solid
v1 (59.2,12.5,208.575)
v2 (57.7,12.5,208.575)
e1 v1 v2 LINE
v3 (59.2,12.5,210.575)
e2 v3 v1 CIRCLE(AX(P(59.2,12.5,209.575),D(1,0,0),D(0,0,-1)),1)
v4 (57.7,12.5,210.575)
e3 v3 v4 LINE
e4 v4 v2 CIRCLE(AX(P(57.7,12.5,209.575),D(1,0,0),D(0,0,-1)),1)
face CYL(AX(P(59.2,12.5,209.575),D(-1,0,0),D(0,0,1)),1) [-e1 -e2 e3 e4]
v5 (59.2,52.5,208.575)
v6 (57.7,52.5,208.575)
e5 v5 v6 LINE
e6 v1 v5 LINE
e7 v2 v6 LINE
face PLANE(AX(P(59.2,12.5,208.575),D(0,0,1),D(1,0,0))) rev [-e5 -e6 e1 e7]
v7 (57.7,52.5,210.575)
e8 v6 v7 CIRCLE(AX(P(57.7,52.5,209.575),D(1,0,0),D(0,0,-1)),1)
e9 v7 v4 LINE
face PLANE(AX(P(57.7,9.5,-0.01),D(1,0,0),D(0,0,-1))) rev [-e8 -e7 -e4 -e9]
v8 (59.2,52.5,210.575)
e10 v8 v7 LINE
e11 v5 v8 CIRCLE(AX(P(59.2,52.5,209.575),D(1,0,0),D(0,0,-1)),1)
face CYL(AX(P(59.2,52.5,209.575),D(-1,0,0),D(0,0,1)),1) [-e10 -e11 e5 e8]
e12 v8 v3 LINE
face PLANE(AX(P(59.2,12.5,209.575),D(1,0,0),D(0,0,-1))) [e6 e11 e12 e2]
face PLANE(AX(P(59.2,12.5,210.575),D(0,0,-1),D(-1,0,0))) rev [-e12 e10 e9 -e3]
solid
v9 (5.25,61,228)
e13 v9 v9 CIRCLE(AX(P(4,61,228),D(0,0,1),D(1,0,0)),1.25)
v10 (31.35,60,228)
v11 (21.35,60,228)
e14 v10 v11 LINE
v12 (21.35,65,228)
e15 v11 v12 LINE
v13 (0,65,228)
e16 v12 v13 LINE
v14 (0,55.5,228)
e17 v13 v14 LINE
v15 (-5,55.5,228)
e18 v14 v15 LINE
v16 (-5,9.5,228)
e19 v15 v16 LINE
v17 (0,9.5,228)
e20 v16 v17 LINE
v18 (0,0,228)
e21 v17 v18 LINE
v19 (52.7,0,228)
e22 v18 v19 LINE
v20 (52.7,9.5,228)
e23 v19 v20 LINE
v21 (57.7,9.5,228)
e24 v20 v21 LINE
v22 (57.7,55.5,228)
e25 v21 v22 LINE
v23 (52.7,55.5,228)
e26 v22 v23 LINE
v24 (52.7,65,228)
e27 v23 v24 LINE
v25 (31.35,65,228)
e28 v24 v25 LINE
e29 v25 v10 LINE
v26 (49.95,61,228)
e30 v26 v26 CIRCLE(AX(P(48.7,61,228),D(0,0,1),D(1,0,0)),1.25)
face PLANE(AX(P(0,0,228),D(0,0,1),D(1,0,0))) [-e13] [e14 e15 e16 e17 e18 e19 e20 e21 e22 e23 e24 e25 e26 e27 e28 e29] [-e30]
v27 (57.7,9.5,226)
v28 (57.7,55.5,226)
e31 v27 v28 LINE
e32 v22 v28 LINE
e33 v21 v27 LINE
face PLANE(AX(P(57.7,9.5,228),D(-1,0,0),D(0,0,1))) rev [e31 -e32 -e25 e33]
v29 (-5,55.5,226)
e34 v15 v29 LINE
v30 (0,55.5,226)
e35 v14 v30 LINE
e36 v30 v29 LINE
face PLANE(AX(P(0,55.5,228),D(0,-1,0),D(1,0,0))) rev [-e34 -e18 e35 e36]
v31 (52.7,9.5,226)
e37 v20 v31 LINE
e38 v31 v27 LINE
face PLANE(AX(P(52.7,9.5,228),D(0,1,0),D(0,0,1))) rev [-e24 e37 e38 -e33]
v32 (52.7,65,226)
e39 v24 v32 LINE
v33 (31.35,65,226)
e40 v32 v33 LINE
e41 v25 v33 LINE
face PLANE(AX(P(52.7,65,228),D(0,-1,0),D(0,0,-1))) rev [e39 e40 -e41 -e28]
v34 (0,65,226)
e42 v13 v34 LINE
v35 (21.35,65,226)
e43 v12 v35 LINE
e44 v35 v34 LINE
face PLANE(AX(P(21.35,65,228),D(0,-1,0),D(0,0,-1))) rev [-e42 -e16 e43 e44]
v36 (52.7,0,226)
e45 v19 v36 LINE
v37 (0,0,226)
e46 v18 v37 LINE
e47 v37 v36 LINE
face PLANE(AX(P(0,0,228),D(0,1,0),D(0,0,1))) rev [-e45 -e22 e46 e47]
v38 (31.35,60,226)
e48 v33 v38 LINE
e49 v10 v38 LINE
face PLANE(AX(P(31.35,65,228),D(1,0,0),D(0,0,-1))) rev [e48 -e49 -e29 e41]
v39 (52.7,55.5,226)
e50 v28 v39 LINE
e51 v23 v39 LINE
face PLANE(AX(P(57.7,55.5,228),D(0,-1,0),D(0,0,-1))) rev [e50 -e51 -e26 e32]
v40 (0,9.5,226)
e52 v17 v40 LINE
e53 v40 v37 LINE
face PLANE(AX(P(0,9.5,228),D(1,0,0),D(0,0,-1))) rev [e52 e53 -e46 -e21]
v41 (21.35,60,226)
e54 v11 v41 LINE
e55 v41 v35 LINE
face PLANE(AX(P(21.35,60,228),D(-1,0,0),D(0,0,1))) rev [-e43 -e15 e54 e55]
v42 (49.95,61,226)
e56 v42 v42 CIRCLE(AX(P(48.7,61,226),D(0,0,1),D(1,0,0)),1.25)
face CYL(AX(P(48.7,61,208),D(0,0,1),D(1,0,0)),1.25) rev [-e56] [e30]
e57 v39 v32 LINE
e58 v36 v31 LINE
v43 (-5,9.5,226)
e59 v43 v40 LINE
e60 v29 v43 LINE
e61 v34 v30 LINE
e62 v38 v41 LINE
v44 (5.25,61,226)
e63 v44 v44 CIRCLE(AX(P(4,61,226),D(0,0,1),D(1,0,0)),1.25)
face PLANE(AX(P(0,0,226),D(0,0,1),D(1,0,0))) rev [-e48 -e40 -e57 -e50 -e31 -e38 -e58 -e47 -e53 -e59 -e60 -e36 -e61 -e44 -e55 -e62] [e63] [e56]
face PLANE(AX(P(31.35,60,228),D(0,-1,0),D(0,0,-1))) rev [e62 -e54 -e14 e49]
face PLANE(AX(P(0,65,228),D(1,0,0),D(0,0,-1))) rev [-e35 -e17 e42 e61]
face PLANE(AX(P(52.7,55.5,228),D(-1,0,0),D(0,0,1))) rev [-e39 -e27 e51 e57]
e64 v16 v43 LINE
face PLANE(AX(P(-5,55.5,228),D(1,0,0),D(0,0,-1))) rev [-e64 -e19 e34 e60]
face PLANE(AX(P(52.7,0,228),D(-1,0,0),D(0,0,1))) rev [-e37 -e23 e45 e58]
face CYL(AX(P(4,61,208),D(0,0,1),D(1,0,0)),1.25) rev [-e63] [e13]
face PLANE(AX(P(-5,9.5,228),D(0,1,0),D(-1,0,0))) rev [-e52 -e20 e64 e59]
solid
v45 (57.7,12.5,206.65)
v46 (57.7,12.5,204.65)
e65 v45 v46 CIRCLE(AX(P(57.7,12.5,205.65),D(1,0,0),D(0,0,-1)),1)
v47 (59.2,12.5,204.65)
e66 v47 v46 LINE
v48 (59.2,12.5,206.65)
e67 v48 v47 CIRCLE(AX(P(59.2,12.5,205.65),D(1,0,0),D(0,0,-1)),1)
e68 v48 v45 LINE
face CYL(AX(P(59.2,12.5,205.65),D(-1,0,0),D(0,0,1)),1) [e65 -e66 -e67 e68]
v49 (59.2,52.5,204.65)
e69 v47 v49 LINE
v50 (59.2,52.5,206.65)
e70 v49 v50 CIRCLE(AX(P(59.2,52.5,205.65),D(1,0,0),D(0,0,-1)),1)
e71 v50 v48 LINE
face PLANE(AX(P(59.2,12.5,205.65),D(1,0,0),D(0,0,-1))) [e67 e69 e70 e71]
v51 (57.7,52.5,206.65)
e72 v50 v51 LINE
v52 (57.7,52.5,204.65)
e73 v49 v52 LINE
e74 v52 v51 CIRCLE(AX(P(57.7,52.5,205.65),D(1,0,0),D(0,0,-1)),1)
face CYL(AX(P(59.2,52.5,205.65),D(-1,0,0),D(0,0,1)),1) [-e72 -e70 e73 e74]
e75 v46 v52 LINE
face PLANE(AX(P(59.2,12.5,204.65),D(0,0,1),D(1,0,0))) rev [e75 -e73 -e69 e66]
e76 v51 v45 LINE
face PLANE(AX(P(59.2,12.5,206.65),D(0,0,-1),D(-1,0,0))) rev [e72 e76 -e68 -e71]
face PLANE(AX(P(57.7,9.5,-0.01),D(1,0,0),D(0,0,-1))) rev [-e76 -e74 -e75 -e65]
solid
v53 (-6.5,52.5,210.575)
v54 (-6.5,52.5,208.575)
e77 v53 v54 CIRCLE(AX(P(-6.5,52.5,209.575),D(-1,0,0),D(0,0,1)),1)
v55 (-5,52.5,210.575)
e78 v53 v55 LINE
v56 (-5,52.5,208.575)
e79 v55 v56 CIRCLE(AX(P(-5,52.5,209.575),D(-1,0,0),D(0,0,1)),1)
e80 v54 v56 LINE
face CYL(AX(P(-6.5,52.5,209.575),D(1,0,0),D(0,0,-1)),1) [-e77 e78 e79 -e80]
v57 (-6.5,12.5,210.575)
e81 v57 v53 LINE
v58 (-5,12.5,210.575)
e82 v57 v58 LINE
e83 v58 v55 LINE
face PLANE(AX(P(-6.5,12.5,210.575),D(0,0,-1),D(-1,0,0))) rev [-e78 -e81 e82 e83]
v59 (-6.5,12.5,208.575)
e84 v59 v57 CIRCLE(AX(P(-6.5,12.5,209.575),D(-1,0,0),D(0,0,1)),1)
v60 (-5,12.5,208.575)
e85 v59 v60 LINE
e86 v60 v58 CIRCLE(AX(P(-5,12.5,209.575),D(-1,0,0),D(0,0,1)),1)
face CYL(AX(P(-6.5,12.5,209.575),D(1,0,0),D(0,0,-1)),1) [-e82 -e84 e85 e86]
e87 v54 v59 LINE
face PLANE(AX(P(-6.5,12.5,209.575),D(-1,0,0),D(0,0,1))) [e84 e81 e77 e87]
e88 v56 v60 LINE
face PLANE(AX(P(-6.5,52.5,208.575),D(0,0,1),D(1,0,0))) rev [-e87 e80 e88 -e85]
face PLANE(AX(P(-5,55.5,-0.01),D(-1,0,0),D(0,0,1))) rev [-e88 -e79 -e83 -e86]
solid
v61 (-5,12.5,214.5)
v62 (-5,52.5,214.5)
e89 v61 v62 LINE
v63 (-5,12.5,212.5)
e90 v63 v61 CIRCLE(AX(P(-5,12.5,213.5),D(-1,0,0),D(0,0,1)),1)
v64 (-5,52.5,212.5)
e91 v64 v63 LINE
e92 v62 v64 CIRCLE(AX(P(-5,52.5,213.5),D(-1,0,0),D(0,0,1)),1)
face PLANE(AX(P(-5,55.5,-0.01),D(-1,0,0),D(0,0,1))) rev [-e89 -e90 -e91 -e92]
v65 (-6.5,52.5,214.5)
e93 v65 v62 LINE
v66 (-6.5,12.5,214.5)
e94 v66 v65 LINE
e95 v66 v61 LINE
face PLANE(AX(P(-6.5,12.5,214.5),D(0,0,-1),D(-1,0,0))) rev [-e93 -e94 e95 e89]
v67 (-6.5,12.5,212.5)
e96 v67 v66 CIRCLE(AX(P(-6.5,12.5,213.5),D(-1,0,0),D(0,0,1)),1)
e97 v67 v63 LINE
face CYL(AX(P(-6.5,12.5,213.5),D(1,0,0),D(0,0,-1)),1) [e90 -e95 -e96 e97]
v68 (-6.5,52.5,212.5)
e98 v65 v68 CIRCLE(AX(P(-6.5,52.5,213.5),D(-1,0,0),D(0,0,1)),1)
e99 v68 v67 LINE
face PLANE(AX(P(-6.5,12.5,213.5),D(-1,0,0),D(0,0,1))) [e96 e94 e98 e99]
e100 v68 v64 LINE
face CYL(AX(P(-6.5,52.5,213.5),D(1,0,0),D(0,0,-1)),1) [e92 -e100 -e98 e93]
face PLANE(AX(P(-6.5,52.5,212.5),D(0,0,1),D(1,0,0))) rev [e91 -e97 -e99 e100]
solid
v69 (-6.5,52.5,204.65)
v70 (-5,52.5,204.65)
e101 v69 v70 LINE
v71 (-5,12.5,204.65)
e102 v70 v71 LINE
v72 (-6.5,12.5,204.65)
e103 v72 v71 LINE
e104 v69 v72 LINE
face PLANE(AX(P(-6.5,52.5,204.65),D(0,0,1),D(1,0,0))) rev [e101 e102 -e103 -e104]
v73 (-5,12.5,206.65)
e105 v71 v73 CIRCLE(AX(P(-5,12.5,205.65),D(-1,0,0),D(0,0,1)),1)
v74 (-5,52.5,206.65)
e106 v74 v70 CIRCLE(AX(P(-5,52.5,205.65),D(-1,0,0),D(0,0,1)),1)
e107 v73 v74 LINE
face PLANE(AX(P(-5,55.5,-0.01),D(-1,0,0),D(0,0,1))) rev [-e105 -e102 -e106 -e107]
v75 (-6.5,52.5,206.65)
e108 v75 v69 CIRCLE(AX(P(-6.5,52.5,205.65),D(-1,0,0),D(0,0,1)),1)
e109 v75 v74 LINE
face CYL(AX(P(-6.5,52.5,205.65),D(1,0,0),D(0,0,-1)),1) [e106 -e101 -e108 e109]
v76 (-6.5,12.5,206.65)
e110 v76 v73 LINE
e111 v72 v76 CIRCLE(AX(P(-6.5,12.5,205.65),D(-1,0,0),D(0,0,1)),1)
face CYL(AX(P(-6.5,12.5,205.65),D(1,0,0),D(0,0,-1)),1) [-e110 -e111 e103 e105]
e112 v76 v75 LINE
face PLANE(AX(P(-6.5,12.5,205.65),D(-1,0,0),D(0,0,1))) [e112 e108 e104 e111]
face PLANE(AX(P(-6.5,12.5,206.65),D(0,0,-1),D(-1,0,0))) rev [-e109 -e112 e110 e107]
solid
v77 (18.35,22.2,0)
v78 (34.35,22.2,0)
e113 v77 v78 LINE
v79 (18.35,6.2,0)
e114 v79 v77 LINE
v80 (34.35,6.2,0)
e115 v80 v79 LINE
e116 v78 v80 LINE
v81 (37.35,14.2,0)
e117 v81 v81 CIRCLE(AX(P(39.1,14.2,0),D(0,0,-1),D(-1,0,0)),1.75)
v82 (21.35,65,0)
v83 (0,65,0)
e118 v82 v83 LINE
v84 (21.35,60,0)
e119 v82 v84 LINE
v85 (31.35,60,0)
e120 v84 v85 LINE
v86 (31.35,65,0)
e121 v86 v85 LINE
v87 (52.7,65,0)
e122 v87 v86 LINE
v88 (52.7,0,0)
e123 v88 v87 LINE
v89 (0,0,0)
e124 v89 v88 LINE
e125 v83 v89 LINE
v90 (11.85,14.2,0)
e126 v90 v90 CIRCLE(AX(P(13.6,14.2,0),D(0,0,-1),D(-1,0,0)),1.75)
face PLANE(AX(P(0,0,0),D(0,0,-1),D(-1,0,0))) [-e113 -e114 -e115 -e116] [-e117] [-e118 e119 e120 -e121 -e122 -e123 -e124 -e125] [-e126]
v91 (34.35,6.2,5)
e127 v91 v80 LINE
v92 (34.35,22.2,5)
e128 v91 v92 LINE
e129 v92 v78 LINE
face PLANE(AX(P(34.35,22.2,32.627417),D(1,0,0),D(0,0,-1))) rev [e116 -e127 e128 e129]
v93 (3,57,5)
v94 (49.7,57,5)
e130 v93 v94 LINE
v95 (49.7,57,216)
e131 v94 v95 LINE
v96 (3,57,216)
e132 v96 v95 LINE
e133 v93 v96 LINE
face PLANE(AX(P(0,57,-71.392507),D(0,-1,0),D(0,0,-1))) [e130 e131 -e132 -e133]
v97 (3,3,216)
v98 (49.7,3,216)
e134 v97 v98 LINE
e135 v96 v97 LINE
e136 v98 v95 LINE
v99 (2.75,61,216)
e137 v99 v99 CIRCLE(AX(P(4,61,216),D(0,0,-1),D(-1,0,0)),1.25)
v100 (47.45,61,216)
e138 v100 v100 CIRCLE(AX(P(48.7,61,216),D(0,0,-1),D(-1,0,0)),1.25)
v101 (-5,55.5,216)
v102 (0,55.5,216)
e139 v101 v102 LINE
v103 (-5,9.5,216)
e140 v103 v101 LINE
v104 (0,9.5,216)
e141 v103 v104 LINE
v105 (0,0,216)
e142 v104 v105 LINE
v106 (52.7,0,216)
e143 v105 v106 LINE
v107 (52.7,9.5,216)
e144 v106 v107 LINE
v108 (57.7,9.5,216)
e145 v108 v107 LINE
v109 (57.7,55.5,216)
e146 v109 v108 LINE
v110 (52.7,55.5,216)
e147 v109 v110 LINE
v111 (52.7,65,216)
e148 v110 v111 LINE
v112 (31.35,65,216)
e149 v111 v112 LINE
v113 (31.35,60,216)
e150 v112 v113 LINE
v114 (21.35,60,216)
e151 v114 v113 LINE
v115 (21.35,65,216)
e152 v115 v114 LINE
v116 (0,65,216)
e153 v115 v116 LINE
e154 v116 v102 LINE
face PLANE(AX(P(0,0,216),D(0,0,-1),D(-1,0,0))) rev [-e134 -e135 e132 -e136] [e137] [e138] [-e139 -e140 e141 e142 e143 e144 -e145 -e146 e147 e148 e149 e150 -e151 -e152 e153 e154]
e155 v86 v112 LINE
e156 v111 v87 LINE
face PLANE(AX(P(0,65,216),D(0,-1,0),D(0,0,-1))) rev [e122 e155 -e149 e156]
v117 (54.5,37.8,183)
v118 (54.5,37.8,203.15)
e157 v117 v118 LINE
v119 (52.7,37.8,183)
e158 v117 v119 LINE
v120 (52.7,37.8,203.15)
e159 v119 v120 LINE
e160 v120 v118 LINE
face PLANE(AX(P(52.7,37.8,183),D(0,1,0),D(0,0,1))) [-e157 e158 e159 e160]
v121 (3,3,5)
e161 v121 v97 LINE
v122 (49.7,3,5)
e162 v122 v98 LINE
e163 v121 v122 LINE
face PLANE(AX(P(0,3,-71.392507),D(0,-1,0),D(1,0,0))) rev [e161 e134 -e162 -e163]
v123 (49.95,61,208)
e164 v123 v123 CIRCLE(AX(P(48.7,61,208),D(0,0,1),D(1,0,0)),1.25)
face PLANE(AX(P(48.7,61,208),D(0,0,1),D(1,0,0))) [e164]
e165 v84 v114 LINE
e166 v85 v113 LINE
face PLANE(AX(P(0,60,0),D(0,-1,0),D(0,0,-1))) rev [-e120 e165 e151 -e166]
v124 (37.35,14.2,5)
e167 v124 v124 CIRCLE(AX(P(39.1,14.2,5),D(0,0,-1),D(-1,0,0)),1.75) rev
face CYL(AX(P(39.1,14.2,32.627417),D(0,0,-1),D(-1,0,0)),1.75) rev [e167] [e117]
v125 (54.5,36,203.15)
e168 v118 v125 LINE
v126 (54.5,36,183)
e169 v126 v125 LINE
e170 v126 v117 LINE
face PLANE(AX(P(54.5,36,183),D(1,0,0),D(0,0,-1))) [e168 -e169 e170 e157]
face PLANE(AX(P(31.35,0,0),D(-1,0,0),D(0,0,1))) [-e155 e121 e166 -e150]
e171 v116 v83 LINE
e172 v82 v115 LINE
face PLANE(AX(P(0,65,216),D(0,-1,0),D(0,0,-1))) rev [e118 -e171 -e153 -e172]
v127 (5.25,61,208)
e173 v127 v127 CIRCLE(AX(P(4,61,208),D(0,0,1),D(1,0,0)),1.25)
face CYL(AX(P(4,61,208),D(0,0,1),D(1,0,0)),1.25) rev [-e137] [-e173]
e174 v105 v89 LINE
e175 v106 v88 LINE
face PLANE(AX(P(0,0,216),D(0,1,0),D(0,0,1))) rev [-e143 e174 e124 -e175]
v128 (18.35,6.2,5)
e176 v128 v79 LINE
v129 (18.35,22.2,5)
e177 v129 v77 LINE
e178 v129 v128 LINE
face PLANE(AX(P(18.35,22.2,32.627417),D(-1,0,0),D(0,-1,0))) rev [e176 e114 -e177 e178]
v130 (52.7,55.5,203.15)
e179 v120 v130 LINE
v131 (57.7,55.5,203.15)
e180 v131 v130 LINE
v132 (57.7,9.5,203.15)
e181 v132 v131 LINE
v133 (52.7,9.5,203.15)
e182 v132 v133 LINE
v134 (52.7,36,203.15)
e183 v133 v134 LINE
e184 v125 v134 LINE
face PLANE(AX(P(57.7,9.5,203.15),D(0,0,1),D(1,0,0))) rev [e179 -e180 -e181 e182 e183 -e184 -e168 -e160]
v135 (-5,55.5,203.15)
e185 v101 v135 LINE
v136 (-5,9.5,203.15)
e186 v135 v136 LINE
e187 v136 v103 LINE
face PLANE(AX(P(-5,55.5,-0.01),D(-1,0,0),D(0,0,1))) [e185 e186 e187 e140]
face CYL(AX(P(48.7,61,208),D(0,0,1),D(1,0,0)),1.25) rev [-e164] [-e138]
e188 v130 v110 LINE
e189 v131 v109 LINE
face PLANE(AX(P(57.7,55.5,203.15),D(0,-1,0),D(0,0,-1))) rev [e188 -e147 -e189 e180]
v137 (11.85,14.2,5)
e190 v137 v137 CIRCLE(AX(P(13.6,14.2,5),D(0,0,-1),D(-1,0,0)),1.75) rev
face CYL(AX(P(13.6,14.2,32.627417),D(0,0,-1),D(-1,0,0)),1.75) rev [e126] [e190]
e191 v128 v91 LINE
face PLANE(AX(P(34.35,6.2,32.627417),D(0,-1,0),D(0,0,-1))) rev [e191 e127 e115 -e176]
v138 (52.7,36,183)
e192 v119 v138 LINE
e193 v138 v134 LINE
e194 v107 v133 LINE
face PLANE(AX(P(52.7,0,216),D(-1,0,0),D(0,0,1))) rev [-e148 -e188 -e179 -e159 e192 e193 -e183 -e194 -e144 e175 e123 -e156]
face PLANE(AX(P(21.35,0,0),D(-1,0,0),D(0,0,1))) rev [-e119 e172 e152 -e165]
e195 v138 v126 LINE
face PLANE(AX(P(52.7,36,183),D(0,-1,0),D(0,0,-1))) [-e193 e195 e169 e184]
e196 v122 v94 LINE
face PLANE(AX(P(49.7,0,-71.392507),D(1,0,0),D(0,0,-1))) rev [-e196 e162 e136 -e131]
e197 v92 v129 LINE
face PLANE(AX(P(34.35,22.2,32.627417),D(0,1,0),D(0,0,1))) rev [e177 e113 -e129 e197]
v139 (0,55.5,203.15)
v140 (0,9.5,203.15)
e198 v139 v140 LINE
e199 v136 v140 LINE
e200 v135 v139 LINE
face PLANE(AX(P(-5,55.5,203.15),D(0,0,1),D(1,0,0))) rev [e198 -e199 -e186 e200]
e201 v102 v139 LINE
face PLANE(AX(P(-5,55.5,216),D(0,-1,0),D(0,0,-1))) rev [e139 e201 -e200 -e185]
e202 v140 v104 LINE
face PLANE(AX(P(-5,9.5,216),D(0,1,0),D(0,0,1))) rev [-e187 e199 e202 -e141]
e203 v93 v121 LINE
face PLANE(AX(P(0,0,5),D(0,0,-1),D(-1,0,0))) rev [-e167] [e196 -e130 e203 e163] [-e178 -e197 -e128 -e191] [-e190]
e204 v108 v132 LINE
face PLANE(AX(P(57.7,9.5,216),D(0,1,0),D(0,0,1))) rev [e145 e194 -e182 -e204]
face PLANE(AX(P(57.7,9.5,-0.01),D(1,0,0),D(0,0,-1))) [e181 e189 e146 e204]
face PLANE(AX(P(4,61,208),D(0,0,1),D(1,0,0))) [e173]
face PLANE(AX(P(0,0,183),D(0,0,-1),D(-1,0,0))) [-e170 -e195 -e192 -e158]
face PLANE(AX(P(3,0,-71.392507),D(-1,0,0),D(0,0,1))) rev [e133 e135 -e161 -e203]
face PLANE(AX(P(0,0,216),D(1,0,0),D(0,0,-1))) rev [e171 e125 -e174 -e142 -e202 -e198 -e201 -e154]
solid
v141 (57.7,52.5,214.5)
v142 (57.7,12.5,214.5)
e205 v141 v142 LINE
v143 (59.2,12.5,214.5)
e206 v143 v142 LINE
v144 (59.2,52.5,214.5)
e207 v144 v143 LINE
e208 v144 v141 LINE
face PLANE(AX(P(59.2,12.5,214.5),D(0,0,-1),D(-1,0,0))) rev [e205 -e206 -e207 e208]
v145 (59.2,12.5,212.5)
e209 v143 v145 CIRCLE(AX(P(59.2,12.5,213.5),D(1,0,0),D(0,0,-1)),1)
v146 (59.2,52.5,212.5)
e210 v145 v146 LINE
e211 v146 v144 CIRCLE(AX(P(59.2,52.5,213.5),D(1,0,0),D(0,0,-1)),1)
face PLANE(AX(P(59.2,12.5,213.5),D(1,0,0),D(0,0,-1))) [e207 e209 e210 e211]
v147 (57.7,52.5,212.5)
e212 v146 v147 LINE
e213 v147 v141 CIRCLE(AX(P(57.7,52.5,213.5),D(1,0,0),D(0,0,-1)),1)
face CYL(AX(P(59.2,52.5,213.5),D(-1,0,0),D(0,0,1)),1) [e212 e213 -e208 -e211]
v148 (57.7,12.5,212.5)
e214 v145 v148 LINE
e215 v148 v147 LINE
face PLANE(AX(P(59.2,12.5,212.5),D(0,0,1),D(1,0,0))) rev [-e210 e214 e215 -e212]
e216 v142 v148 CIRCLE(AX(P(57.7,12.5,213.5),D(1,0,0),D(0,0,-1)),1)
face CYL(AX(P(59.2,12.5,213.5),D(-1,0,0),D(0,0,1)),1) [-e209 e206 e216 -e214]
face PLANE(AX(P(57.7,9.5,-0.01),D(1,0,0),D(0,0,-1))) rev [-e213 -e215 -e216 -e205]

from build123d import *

# Parameters (mm, degrees)
SKETCH_1_W             = 52.7
SKETCH_1_H             = 65
EXTRUDE_1_DEPTH        = 216
SKETCH_2_W             = 10
SKETCH_2_H             = 5
CUT_EXTRUDE_1_DEPTH    = 232.642591075
SKETCH_3_W             = 46.7
SKETCH_3_H             = 54
CUT_EXTRUDE_2_DEPTH    = 211
SKETCH_6_R             = 1.75
SKETCH_6_W             = 16
SKETCH_6_H             = 16
CUT_EXTRUDE_3_DEPTH    = 5
SKETCH_7_W             = 1.8
SKETCH_7_H             = 1.8
EXTRUDE_2_DEPTH        = 33
SKETCH_9_W             = 12.85
SKETCH_9_H             = 46
EXTRUDE_3_DEPTH        = 5
SKETCH_10_W            = 12.85
SKETCH_10_H            = 46
EXTRUDE_4_DEPTH        = 5
EXTRUDE_5_DEPTH        = 1.5
EXTRUDE_START          = 1.5
EXTRUDE_6_DEPTH        = 1.5
EXTRUDE_7_DEPTH        = 2
SKETCH_15_R            = 1.25
CUT_EXTRUDE_4_DEPTH    = 20
SPLIT_START            = 57.7
SPLIT_BODIES_1_DEPTH   = 1.5
SPLIT_BODIES_1_2_DEPTH = 1.5
SPLIT_BODIES_1_3_DEPTH = 1.5
SPLIT_START_2          = -6.5
SPLIT_BODIES_1_4_DEPTH = 1.5
SPLIT_BODIES_1_5_DEPTH = 1.5
SPLIT_BODIES_1_6_DEPTH = 1.5
SPLIT_BODIES_1_7_DEPTH = 1.5
SPLIT_BODIES_1_8_DEPTH = 1.5


# Read off the part's stored shape, not the designer's step: 分割1
with BuildPart() as part:
    # 草图1 → 凸台-拉伸1 (new body)
    with BuildSketch(Plane.XY):
        with Locations((26.35, 32.5)):
            Rectangle(SKETCH_1_W, SKETCH_1_H)
    extrude(amount=EXTRUDE_1_DEPTH)

    # 草图2 → 切除-拉伸1 (cut, through all)
    with BuildSketch(Plane.XY.offset(216)):
        with Locations((26.35, 62.5)):
            Rectangle(SKETCH_2_W, SKETCH_2_H)
    extrude(amount=-CUT_EXTRUDE_1_DEPTH, mode=Mode.SUBTRACT)

    # 草图3 → 切除-拉伸2 (cut)
    with BuildSketch(Plane.XY.offset(216)):
        with Locations((26.35, 30)):
            Rectangle(SKETCH_3_W, SKETCH_3_H)
    extrude(amount=-CUT_EXTRUDE_2_DEPTH, mode=Mode.SUBTRACT)

    # 草图6 → 切除-拉伸3 (cut)
    with BuildSketch(Plane(origin=(0, 0, 0), x_dir=(-1, 0, 0), z_dir=(0, 0, -1))):
        with Locations((-13.6, 14.2)):
            Circle(SKETCH_6_R)
        with Locations((-39.1, 14.2)):
            Circle(SKETCH_6_R)
        with Locations((-26.35, 14.2)):
            Rectangle(SKETCH_6_W, SKETCH_6_H)
    extrude(amount=-CUT_EXTRUDE_3_DEPTH, mode=Mode.SUBTRACT)

    # 草图7 → 凸台-拉伸2 (add)
    with BuildSketch(Plane.XY.offset(216)):
        with Locations((53.6, 36.9)):
            Rectangle(SKETCH_7_W, SKETCH_7_H)
    extrude(amount=-EXTRUDE_2_DEPTH)

    # 草图9 → 凸台-拉伸3 (add)
    with BuildSketch(Plane.ZY):
        with Locations((209.575, 32.5)):
            Rectangle(SKETCH_9_W, SKETCH_9_H)
    extrude(amount=EXTRUDE_3_DEPTH)

    # 草图10 → 凸台-拉伸4 (add)
    with BuildSketch(Plane(origin=(52.7, 0, 0), x_dir=(0, 0, -1), z_dir=(1, 0, 0))):
        with Locations((-209.575, 32.5)):
            Rectangle(SKETCH_10_W, SKETCH_10_H)
    extrude(amount=EXTRUDE_4_DEPTH)

    # 草图11 → 凸台-拉伸5 (add)
    with BuildSketch(Plane(origin=(57.7, 0, 0), x_dir=(0, 0, -1), z_dir=(1, 0, 0))):
        with BuildLine():
            Line((-214.5, 12.5), (-214.5, 52.5))
            ThreePointArc((-214.5, 52.5), (-213.5, 53.5), (-212.5, 52.5))
            Line((-212.5, 52.5), (-212.5, 12.5))
            ThreePointArc((-212.5, 12.5), (-213.5, 11.5), (-214.5, 12.5))
        make_face()
        with BuildLine():
            Line((-210.575, 12.5), (-210.575, 52.5))
            ThreePointArc((-210.575, 52.5), (-209.575, 53.5), (-208.575, 52.5))
            Line((-208.575, 52.5), (-208.575, 12.5))
            ThreePointArc((-208.575, 12.5), (-209.575, 11.5), (-210.575, 12.5))
        make_face()
        with BuildLine():
            Line((-206.65, 12.5), (-206.65, 52.5))
            ThreePointArc((-206.65, 52.5), (-205.65, 53.5), (-204.65, 52.5))
            Line((-204.65, 52.5), (-204.65, 12.5))
            ThreePointArc((-204.65, 12.5), (-205.65, 11.5), (-206.65, 12.5))
        make_face()
    extrude(amount=EXTRUDE_5_DEPTH)

    # 草图12 → 凸台-拉伸6 (add)
    with BuildSketch(Plane.ZY.offset(5).offset(EXTRUDE_START)):
        with BuildLine():
            Line((214.5, 12.5), (214.5, 52.5))
            ThreePointArc((214.5, 52.5), (213.5, 53.5), (212.5, 52.5))
            Line((212.5, 52.5), (212.5, 12.5))
            ThreePointArc((212.5, 12.5), (213.5, 11.5), (214.5, 12.5))
        make_face()
        with BuildLine():
            Line((206.65, 12.5), (206.65, 52.5))
            ThreePointArc((206.65, 52.5), (205.65, 53.5), (204.65, 52.5))
            Line((204.65, 52.5), (204.65, 12.5))
            ThreePointArc((204.65, 12.5), (205.65, 11.5), (206.65, 12.5))
        make_face()
        with BuildLine():
            Line((210.575, 12.5), (210.575, 52.5))
            ThreePointArc((210.575, 52.5), (209.575, 53.5), (208.575, 52.5))
            Line((208.575, 52.5), (208.575, 12.5))
            ThreePointArc((208.575, 12.5), (209.575, 11.5), (210.575, 12.5))
        make_face()
    extrude(amount=-EXTRUDE_6_DEPTH)


with BuildPart() as body_2:
    # 草图14 → 凸台-拉伸7 (new body)
    with BuildSketch(Plane.XY.offset(226)):
        Polygon((57.7, 55.5), (52.7, 55.5), (52.7, 65), (31.35, 65), (31.35, 60), (21.35, 60), (21.35, 65), (0, 65), (0, 55.5), (-5, 55.5), (-5, 9.5), (0, 9.5), (0, 0), (52.7, 0), (52.7, 9.5), (57.7, 9.5), align=None)
    extrude(amount=EXTRUDE_7_DEPTH)


with BuildPart() as cut_extrude_4_tool:
    # 草图15 → 切除-拉伸4 (new body)
    with BuildSketch(Plane.XY.offset(228)):
        with Locations((4, 61)):
            Circle(SKETCH_15_R)
        with Locations((48.7, 61)):
            Circle(SKETCH_15_R)
    extrude(amount=-CUT_EXTRUDE_4_DEPTH)


with BuildPart() as part_1:
    add(part.part)

    # 切除-拉伸4: cut by cut_extrude_4_tool
    add(cut_extrude_4_tool.part, mode=Mode.SUBTRACT)

    # Split Bodies 1 7 outline → Split Bodies 1 7 (cut)
    with BuildSketch(Plane.YZ.offset(SPLIT_START_2)):
        with BuildLine():
            ThreePointArc((12.5, 214.5), (11.5, 213.5), (12.5, 212.5))
            Line((12.5, 212.5), (52.5, 212.5))
            ThreePointArc((52.5, 212.5), (53.5, 213.5), (52.5, 214.5))
            Line((52.5, 214.5), (12.5, 214.5))
        make_face()
        with BuildLine():
            ThreePointArc((12.5, 210.575), (11.5, 209.575), (12.5, 208.575))
            Line((12.5, 208.575), (52.5, 208.575))
            ThreePointArc((52.5, 208.575), (53.5, 209.575), (52.5, 210.575))
            Line((52.5, 210.575), (12.5, 210.575))
        make_face()
        with BuildLine():
            ThreePointArc((12.5, 206.65), (11.5, 205.65), (12.5, 204.65))
            Line((12.5, 204.65), (52.5, 204.65))
            ThreePointArc((52.5, 204.65), (53.5, 205.65), (52.5, 206.65))
            Line((52.5, 206.65), (12.5, 206.65))
        make_face()
    extrude(amount=SPLIT_BODIES_1_7_DEPTH, mode=Mode.SUBTRACT)

    # Split Bodies 1 8 outline → Split Bodies 1 8 (cut)
    with BuildSketch(Plane.YZ.offset(SPLIT_START)):
        with BuildLine():
            ThreePointArc((12.5, 214.5), (11.5, 213.5), (12.5, 212.5))
            Line((12.5, 212.5), (52.5, 212.5))
            ThreePointArc((52.5, 212.5), (53.5, 213.5), (52.5, 214.5))
            Line((52.5, 214.5), (12.5, 214.5))
        make_face()
        with BuildLine():
            ThreePointArc((12.5, 210.575), (11.5, 209.575), (12.5, 208.575))
            Line((12.5, 208.575), (52.5, 208.575))
            ThreePointArc((52.5, 208.575), (53.5, 209.575), (52.5, 210.575))
            Line((52.5, 210.575), (12.5, 210.575))
        make_face()
        with BuildLine():
            ThreePointArc((12.5, 206.65), (11.5, 205.65), (12.5, 204.65))
            Line((12.5, 204.65), (52.5, 204.65))
            ThreePointArc((52.5, 204.65), (53.5, 205.65), (52.5, 206.65))
            Line((52.5, 206.65), (12.5, 206.65))
        make_face()
    extrude(amount=SPLIT_BODIES_1_8_DEPTH, mode=Mode.SUBTRACT)


with BuildPart() as body_2_1:
    add(body_2.part)

    # 切除-拉伸4: cut by cut_extrude_4_tool
    add(cut_extrude_4_tool.part, mode=Mode.SUBTRACT)


with BuildPart() as body_3:
    # Split Bodies 1 outline → Split Bodies 1 (new body)
    with BuildSketch(Plane.YZ.offset(SPLIT_START)):
        with BuildLine():
            Line((12.5, 212.5), (52.5, 212.5))
            ThreePointArc((52.5, 212.5), (53.5, 213.5), (52.5, 214.5))
            Line((52.5, 214.5), (12.5, 214.5))
            ThreePointArc((12.5, 214.5), (11.5, 213.5), (12.5, 212.5))
        make_face()
    extrude(amount=SPLIT_BODIES_1_DEPTH)


with BuildPart() as body_4:
    # Split Bodies 1 2 outline → Split Bodies 1 2 (new body)
    with BuildSketch(Plane.YZ.offset(SPLIT_START)):
        with BuildLine():
            Line((12.5, 208.575), (52.5, 208.575))
            ThreePointArc((52.5, 208.575), (53.5, 209.575), (52.5, 210.575))
            Line((52.5, 210.575), (12.5, 210.575))
            ThreePointArc((12.5, 210.575), (11.5, 209.575), (12.5, 208.575))
        make_face()
    extrude(amount=SPLIT_BODIES_1_2_DEPTH)


with BuildPart() as body_5:
    # Split Bodies 1 3 outline → Split Bodies 1 3 (new body)
    with BuildSketch(Plane.YZ.offset(SPLIT_START)):
        with BuildLine():
            Line((12.5, 204.65), (52.5, 204.65))
            ThreePointArc((52.5, 204.65), (53.5, 205.65), (52.5, 206.65))
            Line((52.5, 206.65), (12.5, 206.65))
            ThreePointArc((12.5, 206.65), (11.5, 205.65), (12.5, 204.65))
        make_face()
    extrude(amount=SPLIT_BODIES_1_3_DEPTH)


with BuildPart() as body_6:
    # Split Bodies 1 4 outline → Split Bodies 1 4 (new body)
    with BuildSketch(Plane.YZ.offset(SPLIT_START_2)):
        with BuildLine():
            Line((52.5, 214.5), (12.5, 214.5))
            ThreePointArc((12.5, 214.5), (11.5, 213.5), (12.5, 212.5))
            Line((12.5, 212.5), (52.5, 212.5))
            ThreePointArc((52.5, 212.5), (53.5, 213.5), (52.5, 214.5))
        make_face()
    extrude(amount=SPLIT_BODIES_1_4_DEPTH)


with BuildPart() as body_7:
    # Split Bodies 1 5 outline → Split Bodies 1 5 (new body)
    with BuildSketch(Plane.YZ.offset(SPLIT_START_2)):
        with BuildLine():
            Line((52.5, 206.65), (12.5, 206.65))
            ThreePointArc((12.5, 206.65), (11.5, 205.65), (12.5, 204.65))
            Line((12.5, 204.65), (52.5, 204.65))
            ThreePointArc((52.5, 204.65), (53.5, 205.65), (52.5, 206.65))
        make_face()
    extrude(amount=SPLIT_BODIES_1_5_DEPTH)


with BuildPart() as body_8:
    # Split Bodies 1 6 outline → Split Bodies 1 6 (new body)
    with BuildSketch(Plane.YZ.offset(SPLIT_START_2)):
        with BuildLine():
            Line((52.5, 210.575), (12.5, 210.575))
            ThreePointArc((12.5, 210.575), (11.5, 209.575), (12.5, 208.575))
            Line((12.5, 208.575), (52.5, 208.575))
            ThreePointArc((52.5, 208.575), (53.5, 209.575), (52.5, 210.575))
        make_face()
    extrude(amount=SPLIT_BODIES_1_6_DEPTH)


solid = Compound([part_1.part, body_2_1.part, body_3.part, body_4.part, body_5.part, body_6.part, body_7.part, body_8.part])
